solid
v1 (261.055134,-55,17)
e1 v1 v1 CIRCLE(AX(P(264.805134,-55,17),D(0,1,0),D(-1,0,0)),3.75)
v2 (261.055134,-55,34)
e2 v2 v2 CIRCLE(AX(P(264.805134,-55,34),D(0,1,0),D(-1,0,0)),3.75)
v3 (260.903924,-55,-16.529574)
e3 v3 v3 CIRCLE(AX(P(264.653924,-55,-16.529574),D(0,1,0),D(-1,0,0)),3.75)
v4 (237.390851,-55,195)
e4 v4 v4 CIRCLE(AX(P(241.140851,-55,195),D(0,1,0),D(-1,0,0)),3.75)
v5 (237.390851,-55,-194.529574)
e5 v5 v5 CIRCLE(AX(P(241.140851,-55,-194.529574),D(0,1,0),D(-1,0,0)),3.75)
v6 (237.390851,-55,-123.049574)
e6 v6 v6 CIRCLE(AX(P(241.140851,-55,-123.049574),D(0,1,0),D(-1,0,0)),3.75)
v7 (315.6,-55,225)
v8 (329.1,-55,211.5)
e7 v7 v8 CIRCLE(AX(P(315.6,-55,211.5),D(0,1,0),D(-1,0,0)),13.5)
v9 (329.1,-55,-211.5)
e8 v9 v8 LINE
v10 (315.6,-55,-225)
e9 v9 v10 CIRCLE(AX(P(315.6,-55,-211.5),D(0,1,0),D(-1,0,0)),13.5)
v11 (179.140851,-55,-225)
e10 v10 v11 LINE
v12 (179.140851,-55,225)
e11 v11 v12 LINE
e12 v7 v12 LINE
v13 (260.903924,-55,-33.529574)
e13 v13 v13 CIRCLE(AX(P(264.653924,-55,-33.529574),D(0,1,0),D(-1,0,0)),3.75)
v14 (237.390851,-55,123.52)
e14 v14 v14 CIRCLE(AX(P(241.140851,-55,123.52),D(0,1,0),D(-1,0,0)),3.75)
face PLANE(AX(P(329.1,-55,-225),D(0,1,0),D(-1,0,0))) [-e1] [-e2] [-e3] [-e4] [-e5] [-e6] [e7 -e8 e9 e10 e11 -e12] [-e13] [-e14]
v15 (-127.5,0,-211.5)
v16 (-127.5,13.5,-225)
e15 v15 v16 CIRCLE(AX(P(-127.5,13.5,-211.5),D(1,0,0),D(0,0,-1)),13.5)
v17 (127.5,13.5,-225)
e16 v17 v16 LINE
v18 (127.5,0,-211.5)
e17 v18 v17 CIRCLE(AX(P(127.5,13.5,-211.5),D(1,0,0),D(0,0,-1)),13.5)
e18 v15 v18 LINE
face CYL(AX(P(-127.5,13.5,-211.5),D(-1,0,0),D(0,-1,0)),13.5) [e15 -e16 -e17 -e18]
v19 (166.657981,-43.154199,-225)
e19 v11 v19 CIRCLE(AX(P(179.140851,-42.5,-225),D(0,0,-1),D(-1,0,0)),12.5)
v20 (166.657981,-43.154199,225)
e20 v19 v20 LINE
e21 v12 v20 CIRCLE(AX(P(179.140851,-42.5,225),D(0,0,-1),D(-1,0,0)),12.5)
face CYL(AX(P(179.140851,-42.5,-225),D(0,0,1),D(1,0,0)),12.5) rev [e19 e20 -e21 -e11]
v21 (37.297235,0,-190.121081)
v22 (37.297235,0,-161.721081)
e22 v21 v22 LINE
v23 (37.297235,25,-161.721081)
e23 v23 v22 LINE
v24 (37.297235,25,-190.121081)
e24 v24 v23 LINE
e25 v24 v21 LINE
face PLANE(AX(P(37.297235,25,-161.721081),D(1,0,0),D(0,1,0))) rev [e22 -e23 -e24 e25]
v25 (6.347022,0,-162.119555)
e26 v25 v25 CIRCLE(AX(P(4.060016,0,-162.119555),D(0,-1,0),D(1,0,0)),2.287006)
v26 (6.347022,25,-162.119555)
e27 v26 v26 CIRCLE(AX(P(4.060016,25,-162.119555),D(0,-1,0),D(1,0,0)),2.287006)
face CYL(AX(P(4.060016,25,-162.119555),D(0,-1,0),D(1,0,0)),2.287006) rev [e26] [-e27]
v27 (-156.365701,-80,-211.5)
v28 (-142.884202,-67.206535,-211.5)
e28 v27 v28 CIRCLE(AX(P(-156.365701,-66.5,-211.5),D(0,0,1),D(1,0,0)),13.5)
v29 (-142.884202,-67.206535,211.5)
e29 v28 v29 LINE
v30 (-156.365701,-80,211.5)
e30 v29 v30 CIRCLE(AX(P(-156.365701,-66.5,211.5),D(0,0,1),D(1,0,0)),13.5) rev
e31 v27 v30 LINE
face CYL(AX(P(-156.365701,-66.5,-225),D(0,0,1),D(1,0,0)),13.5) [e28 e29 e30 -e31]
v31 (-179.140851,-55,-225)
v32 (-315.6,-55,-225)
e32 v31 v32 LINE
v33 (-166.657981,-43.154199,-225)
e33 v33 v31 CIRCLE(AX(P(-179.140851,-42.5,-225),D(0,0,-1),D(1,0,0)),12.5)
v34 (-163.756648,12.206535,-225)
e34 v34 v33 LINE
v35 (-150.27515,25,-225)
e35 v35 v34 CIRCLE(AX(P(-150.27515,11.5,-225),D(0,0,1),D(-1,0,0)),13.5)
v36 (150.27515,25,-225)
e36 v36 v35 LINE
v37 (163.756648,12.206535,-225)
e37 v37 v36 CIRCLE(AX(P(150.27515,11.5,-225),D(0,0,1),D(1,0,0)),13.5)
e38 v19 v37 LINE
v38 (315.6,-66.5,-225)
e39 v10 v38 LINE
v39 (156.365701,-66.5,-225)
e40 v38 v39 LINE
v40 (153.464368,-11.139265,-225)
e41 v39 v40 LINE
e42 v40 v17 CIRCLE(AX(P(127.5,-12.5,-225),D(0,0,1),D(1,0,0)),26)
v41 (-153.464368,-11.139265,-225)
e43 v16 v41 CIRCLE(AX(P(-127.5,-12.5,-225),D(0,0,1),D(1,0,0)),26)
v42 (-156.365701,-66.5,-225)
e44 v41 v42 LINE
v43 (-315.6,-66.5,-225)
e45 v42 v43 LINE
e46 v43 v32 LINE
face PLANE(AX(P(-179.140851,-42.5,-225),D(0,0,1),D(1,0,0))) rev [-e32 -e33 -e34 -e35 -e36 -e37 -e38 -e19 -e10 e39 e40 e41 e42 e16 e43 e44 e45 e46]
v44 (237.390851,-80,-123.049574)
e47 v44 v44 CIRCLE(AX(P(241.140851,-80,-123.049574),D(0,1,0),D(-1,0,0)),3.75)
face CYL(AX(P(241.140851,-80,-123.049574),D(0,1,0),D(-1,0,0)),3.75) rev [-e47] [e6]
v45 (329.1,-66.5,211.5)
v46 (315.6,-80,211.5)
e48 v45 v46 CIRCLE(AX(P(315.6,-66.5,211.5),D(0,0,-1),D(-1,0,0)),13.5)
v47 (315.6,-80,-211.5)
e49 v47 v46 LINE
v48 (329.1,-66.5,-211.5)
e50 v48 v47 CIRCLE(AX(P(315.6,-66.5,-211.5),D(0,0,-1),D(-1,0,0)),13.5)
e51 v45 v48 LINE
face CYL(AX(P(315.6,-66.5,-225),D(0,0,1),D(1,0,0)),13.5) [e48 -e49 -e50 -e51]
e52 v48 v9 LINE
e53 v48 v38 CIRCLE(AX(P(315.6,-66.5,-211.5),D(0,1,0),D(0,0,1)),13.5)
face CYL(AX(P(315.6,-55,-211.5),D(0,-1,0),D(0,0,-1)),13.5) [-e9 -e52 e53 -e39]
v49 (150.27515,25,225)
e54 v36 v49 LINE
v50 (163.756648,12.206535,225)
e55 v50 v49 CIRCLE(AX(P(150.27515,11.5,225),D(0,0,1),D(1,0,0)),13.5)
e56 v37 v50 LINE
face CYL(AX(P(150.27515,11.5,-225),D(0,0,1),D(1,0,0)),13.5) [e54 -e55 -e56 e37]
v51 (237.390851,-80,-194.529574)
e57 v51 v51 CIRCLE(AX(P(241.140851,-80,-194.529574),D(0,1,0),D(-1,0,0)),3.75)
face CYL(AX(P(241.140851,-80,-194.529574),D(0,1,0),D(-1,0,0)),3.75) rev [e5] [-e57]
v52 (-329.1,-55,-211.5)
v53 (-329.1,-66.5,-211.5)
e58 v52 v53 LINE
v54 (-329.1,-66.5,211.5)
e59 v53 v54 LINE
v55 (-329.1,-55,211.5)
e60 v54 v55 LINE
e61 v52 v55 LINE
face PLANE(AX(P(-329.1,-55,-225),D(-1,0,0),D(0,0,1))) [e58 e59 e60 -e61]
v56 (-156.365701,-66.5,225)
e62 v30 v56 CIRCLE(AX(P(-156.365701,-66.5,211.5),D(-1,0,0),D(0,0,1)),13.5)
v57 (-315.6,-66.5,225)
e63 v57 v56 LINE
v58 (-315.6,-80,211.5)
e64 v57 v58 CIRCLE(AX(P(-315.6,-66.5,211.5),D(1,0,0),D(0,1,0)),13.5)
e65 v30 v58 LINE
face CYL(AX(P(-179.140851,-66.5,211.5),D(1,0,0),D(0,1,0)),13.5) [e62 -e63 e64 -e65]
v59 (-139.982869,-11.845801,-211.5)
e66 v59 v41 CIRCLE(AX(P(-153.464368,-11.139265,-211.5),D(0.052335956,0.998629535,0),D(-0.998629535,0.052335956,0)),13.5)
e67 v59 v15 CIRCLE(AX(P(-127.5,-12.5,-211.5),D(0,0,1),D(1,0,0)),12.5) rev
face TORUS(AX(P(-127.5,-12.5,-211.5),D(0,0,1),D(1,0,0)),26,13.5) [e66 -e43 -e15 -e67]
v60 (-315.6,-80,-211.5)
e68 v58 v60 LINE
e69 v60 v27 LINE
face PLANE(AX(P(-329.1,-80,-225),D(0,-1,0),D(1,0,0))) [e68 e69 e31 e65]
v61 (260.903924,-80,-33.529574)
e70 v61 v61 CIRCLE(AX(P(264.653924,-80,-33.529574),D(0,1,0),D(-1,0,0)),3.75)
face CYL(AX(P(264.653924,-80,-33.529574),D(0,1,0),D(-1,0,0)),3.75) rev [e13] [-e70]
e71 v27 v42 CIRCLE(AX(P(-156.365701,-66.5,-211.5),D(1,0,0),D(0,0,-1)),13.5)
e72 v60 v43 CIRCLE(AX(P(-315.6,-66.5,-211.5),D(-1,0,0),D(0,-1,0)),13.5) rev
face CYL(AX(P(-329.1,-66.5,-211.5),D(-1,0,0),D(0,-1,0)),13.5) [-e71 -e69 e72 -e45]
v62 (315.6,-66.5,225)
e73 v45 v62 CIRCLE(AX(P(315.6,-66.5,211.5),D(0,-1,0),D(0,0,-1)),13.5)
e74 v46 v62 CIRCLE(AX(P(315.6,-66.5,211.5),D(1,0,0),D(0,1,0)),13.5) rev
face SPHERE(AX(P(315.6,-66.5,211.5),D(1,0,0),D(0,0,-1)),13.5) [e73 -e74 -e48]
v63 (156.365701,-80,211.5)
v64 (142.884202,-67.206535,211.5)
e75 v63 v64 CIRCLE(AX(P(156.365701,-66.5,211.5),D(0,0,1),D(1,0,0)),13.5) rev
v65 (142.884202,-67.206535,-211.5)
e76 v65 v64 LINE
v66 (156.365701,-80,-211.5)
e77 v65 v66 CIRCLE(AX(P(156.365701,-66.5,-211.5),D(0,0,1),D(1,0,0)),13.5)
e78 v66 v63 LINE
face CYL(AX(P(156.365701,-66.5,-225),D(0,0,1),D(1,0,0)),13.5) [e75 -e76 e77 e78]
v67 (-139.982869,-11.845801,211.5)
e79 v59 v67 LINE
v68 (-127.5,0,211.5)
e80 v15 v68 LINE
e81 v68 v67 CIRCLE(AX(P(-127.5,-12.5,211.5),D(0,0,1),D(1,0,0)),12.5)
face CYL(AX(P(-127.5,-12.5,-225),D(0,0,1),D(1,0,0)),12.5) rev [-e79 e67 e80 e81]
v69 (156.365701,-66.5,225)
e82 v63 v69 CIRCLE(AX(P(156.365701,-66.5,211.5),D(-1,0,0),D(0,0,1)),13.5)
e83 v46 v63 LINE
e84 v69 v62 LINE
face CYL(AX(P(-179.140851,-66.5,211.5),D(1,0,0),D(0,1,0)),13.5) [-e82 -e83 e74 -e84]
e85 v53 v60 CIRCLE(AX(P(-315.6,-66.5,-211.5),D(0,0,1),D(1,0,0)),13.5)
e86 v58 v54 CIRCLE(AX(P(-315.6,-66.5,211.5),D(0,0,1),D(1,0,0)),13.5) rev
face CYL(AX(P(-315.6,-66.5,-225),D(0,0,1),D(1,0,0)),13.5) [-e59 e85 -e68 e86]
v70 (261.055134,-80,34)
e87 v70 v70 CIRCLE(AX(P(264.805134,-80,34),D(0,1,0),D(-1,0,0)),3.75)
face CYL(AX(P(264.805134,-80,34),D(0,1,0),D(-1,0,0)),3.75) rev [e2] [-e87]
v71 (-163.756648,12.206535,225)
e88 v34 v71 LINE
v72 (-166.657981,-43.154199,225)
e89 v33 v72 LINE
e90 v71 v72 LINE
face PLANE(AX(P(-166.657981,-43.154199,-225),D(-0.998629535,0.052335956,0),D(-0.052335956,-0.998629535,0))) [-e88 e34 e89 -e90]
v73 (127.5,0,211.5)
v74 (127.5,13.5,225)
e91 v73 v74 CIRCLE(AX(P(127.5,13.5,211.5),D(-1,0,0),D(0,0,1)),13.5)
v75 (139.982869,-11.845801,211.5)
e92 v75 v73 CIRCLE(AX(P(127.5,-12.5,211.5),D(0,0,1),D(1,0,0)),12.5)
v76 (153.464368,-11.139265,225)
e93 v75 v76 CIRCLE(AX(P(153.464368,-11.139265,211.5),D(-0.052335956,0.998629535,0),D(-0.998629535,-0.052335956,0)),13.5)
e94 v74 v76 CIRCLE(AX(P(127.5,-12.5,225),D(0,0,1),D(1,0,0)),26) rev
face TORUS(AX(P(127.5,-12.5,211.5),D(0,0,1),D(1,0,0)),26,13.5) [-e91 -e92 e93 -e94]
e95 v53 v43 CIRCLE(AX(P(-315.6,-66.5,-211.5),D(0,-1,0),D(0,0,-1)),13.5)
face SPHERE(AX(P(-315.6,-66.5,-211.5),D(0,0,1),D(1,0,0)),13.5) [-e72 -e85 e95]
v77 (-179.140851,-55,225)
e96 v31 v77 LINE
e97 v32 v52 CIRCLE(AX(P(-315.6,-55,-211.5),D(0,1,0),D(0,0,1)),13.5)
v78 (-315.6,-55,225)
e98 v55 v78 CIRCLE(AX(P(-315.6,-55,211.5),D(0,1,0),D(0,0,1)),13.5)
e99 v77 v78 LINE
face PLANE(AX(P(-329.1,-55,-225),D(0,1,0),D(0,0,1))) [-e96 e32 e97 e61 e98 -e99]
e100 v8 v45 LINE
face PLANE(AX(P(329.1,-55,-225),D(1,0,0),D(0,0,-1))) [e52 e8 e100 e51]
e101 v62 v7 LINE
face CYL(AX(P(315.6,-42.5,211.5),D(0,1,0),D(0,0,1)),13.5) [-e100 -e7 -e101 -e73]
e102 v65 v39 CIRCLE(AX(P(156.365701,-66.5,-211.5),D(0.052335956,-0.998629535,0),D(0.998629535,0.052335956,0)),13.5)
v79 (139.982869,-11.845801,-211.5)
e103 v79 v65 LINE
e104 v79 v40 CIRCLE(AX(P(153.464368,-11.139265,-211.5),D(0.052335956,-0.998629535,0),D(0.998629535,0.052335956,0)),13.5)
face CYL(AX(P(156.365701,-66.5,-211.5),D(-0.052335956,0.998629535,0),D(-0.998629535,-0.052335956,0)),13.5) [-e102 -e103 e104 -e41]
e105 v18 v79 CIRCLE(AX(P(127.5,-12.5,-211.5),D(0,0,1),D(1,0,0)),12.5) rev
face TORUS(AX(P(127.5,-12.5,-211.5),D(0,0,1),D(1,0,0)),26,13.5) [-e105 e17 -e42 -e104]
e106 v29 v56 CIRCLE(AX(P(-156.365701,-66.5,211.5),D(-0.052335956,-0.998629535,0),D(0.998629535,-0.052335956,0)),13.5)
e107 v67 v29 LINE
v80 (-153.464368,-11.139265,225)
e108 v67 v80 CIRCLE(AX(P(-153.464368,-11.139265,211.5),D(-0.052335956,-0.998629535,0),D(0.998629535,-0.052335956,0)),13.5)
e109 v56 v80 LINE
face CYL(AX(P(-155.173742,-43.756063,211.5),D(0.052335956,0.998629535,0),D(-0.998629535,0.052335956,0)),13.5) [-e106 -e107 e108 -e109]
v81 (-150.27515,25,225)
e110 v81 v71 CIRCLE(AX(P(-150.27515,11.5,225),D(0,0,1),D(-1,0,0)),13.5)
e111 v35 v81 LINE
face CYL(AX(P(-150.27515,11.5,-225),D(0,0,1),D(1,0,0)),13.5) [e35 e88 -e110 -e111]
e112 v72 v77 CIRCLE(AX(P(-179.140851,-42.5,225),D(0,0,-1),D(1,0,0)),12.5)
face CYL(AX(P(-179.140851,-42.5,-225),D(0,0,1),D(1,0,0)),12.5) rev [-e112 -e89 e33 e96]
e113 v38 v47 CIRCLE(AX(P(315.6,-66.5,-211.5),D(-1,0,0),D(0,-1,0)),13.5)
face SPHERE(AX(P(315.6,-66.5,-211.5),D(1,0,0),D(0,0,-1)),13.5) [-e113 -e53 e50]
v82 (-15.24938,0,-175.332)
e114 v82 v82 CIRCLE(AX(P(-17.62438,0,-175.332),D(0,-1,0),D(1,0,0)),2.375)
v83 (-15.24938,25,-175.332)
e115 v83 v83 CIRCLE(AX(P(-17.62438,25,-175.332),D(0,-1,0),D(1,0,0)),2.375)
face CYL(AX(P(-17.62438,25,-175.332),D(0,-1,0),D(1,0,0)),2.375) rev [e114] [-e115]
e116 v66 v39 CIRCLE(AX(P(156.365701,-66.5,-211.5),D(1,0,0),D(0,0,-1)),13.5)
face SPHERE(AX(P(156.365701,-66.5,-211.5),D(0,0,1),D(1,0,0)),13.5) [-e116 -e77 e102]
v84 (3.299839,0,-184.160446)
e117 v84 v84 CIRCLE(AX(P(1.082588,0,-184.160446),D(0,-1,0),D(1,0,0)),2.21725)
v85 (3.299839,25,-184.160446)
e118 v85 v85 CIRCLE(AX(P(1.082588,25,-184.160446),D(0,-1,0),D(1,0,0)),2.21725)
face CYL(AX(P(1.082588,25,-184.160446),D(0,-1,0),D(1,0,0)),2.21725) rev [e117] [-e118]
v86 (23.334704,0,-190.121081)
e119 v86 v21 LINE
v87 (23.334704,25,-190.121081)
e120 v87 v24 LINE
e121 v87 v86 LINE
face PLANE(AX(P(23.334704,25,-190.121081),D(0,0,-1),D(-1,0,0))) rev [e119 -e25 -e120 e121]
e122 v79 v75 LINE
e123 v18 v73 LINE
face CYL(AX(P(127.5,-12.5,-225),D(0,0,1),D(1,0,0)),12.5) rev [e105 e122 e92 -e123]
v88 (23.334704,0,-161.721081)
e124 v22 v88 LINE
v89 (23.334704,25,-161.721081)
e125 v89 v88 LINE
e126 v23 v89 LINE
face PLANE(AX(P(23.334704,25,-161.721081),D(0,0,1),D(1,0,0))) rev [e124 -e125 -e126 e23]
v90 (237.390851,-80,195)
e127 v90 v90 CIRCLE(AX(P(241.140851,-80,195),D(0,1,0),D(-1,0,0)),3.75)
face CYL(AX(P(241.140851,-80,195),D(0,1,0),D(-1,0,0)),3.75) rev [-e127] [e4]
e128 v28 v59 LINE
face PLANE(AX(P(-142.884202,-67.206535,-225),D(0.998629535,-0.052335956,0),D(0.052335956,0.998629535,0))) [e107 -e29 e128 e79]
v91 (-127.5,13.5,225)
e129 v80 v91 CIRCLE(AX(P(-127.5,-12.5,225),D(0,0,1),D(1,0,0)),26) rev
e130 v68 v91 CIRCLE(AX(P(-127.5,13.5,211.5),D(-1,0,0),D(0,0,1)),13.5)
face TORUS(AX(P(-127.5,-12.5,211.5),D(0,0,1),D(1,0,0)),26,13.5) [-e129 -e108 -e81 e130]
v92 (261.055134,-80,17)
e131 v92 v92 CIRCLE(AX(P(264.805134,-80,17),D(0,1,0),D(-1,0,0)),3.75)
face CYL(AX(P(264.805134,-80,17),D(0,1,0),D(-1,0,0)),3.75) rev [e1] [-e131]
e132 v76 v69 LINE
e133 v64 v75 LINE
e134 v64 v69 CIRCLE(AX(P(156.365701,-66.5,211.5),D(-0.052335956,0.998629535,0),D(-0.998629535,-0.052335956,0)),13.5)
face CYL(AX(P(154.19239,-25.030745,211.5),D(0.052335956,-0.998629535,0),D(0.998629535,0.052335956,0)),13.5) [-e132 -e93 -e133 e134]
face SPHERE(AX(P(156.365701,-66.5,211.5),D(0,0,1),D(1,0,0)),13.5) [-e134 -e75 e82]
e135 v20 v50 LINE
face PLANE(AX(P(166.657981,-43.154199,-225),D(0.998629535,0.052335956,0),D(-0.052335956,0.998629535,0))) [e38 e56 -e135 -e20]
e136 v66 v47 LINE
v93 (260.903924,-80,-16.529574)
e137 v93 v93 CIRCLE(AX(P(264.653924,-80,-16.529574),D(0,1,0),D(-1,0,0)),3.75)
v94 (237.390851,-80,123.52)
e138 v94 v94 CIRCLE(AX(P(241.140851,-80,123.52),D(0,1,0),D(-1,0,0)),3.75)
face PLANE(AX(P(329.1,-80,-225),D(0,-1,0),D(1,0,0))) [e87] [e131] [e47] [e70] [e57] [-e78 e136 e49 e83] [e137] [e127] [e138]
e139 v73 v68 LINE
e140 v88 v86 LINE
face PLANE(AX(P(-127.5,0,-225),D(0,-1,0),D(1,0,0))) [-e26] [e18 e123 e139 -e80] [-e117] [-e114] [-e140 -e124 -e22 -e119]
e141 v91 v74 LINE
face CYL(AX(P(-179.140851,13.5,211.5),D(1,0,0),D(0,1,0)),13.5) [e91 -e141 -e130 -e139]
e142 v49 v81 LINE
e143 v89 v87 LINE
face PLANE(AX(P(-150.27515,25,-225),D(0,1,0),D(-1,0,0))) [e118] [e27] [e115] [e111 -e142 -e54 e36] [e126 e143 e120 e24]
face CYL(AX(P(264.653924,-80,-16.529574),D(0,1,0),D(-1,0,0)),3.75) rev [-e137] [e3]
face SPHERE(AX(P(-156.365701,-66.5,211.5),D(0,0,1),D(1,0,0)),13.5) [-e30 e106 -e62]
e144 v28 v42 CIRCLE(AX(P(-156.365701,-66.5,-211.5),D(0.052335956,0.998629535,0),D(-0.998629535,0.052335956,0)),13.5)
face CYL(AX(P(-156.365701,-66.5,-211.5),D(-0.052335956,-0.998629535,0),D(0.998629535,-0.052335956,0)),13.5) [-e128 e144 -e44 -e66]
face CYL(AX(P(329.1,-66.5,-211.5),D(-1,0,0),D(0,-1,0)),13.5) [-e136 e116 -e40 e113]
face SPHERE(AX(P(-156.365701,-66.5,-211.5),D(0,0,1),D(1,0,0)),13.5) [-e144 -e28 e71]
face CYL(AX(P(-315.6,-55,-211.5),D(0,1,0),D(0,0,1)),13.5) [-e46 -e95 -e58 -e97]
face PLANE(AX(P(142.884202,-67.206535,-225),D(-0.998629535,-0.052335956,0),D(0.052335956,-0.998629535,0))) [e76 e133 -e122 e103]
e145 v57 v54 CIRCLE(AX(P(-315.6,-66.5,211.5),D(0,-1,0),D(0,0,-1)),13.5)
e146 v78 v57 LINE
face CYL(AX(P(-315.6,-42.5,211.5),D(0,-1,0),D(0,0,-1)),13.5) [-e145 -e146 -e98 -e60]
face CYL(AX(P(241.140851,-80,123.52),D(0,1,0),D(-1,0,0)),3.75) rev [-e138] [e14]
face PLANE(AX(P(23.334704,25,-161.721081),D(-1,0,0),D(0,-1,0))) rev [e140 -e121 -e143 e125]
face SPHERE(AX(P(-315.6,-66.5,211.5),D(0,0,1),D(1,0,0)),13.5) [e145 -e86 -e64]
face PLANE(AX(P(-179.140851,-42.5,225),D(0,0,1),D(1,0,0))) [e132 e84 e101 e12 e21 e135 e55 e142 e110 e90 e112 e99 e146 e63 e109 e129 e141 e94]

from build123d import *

# Parameters (mm, degrees)
BOSS_EXTRUDE1_DEPTH      = 225
BOSS_EXTRUDE1_DEPTH_BACK = 225
FILLET1_R                = 13.5
FILLET2_R                = 13.5
FILLET3_R                = 13.5
SKETCH2_R                = 3.75
CUT_EXTRUDE1_DEPTH       = 407.610144979
SKETCH3_R                = 2.217250466
SKETCH3_R_2              = 2.287005769
SKETCH3_R_3              = 2.375
SKETCH3_W                = 13.962530501
SKETCH3_H                = 28.400000001
CUT_EXTRUDE2_DEPTH       = 407.610144979


with BuildPart() as part:
    # Sketch1 → Boss-Extrude1 (new, two sides: drawn at the far end of the back side and taken through both)
    with BuildSketch(Plane.XY.offset(-BOSS_EXTRUDE1_DEPTH_BACK)):
        with BuildLine():
            Line((-329.1, -55), (-329.1, -80))
            Line((-329.1, -80), (-156.365701077, -80))
            ThreePointArc((-156.365701077, -80), (-147.072914305, -76.292554009), (-142.884202358, -67.206535409))
            Line((-142.884202358, -67.206535409), (-139.982869184, -11.845800547))
            ThreePointArc((-139.982869184, -11.845800547), (-136.104432196, -3.432820362), (-127.5, 0))
            Line((-127.5, 0), (127.5, 0))
            ThreePointArc((127.5, 0), (136.104432196, -3.432820362), (139.982869184, -11.845800547))
            Line((139.982869184, -11.845800547), (142.884202358, -67.206535409))
            ThreePointArc((142.884202358, -67.206535409), (147.072914305, -76.292554009), (156.365701077, -80))
            Line((156.365701077, -80), (329.1, -80))
            Line((329.1, -80), (329.1, -55))
            Line((329.1, -55), (179.140850678, -55))
            ThreePointArc((179.140850678, -55), (170.536418482, -51.567179638), (166.657981494, -43.154199453))
            Line((166.657981494, -43.154199453), (163.75664832, 12.206535409))
            ThreePointArc((163.75664832, 12.206535409), (159.567936373, 21.292554009), (150.275149601, 25))
            Line((150.275149601, 25), (-150.275149601, 25))
            ThreePointArc((-150.275149601, 25), (-159.567936373, 21.292554009), (-163.75664832, 12.206535409))
            Line((-163.75664832, 12.206535409), (-166.657981494, -43.154199453))
            ThreePointArc((-166.657981494, -43.154199453), (-170.536418482, -51.567179638), (-179.140850678, -55))
            Line((-179.140850678, -55), (-329.1, -55))
        make_face()
    extrude(amount=BOSS_EXTRUDE1_DEPTH + BOSS_EXTRUDE1_DEPTH_BACK)

    # Fillet1
    fillet1_edges = [part.edges().sort_by_distance(p)[0] for p in [
        (-242.732850539, -80, -225),
        (-147.072914305, -76.292554009, -225),
        (-141.433535771, -39.526167978, -225),
        (-136.104432196, -3.432820362, -225),
        (0, 0, -225),
        (136.104432196, -3.432820362, -225),
        (-329.1, -80, 0),
        (141.433535771, -39.526167978, -225),
        (147.072914305, -76.292554009, -225),
        (242.732850539, -80, -225),
        (-242.732850539, -80, 225),
        (-147.072914305, -76.292554009, 225),
        (-141.433535771, -39.526167978, 225),
        (-136.104432196, -3.432820362, 225),
        (0, 0, 225),
        (136.104432196, -3.432820362, 225),
        (141.433535771, -39.526167978, 225),
        (147.072914305, -76.292554009, 225),
        (242.732850539, -80, 225),
    ]]
    fillet(fillet1_edges, radius=FILLET1_R)

    # Fillet2
    fillet2_edges = [part.edges().sort_by_distance(p)[0] for p in [
        (329.1, -80, 0),
        (329.1, -60.75, 225),
        (329.1, -60.75, -225),
        (329.1, -76.045941546, 221.045941546),
        (329.1, -76.045941546, -221.045941546),
    ]]
    fillet(fillet2_edges, radius=FILLET2_R)

    # Fillet3
    # the kernel refuses this fillet: 13.5 mm, written as the material it takes off along each edge
    with BuildSketch(Plane(origin=(-315.6, -66.5, 211.5), x_dir=(0, 0, 1), z_dir=(-1, 0, 0))) as fillet3_piece_1_section:
        Polygon((0, 0), (FILLET3_R, 0), (FILLET3_R, -FILLET3_R), (0, -FILLET3_R), align=None)
    fillet3_piece_1 = extrude(amount=FILLET3_R, mode=Mode.PRIVATE)
    fillet3_piece_1 = fillet3_piece_1 - Plane(origin=(-315.6, -66.5, 211.5), x_dir=(0, 0.7071067811865475, -0.7071067811865475), z_dir=(-1, 0, 0)) * Sphere(FILLET3_R, mode=Mode.PRIVATE)
    add(fillet3_piece_1, mode=Mode.SUBTRACT)
    with BuildSketch(Plane(origin=(-315.6, -66.5, -211.5), x_dir=(-1, 0, 0), z_dir=(0, 0, -1))) as fillet3_piece_2_section:
        Polygon((0, 0), (FILLET3_R, 0), (FILLET3_R, -FILLET3_R), (0, -FILLET3_R), align=None)
    fillet3_piece_2 = extrude(amount=FILLET3_R, mode=Mode.PRIVATE)
    fillet3_piece_2 = fillet3_piece_2 - Plane(origin=(-315.6, -66.5, -211.5), x_dir=(0.7071067811865475, 0.7071067811865475, 0), z_dir=(0, 0, -1)) * Sphere(FILLET3_R, mode=Mode.PRIVATE)
    add(fillet3_piece_2, mode=Mode.SUBTRACT)
    with BuildSketch(Plane(origin=(-329.1, -21.25, 225), x_dir=(0, 0, -1), z_dir=(0, -1, 0)), Plane(origin=(-329.1, -21.25, -225), x_dir=(1, 0, 0), z_dir=(0, -1, 0))) as fillet3_piece_3:
        with BuildLine():
            CenterArc((FILLET3_R, FILLET3_R), FILLET3_R, 180, 90)
            Line((0, FILLET3_R), (0, 0))
            Line((0, 0), (FILLET3_R, 0))
        make_face()
    extrude(amount=45.25, mode=Mode.SUBTRACT)

    # Sketch2 → Cut-Extrude1 (cut, through all)
    with BuildSketch(Plane(origin=(0, -55, 0), x_dir=(1, 0, 0), z_dir=(0, 1, 0))):
        with Locations(Location((264.653924111, 33.529574354, 0), (0, 0, 180))):
            Circle(SKETCH2_R)
        with Locations(Location((264.653924111, 16.529574354, 0), (0, 0, 180))):
            Circle(SKETCH2_R)
        with Locations(Location((264.805133934, -17, 0), (0, 0, 180))):
            Circle(SKETCH2_R)
        with Locations(Location((264.805133934, -34, 0), (0, 0, 180))):
            Circle(SKETCH2_R)
        with Locations(Location((241.140850678, -195, 0), (0, 0, 180))):
            Circle(SKETCH2_R)
        with Locations(Location((241.140850678, -123.52, 0), (0, 0, 180))):
            Circle(SKETCH2_R)
        with Locations(Location((241.140850678, 123.049574354, 0), (0, 0, 180))):
            Circle(SKETCH2_R)
        with Locations(Location((241.140850678, 194.529574354, 0), (0, 0, 180))):
            Circle(SKETCH2_R)
    extrude(amount=-CUT_EXTRUDE1_DEPTH, mode=Mode.SUBTRACT)

    # Sketch3 → Cut-Extrude2 (cut, through all)
    with BuildSketch(Plane.XZ):
        with Locations((1.08258839, -184.160446131)):
            Circle(SKETCH3_R)
        with Locations((4.060016021, -162.119555044)):
            Circle(SKETCH3_R_2)
        with Locations((-17.624379629, -175.332)):
            Circle(SKETCH3_R_3)
        with Locations((30.315969329, -175.921080945)):
            Rectangle(SKETCH3_W, SKETCH3_H)
    extrude(amount=-CUT_EXTRUDE2_DEPTH, mode=Mode.SUBTRACT)


solid = part.part
